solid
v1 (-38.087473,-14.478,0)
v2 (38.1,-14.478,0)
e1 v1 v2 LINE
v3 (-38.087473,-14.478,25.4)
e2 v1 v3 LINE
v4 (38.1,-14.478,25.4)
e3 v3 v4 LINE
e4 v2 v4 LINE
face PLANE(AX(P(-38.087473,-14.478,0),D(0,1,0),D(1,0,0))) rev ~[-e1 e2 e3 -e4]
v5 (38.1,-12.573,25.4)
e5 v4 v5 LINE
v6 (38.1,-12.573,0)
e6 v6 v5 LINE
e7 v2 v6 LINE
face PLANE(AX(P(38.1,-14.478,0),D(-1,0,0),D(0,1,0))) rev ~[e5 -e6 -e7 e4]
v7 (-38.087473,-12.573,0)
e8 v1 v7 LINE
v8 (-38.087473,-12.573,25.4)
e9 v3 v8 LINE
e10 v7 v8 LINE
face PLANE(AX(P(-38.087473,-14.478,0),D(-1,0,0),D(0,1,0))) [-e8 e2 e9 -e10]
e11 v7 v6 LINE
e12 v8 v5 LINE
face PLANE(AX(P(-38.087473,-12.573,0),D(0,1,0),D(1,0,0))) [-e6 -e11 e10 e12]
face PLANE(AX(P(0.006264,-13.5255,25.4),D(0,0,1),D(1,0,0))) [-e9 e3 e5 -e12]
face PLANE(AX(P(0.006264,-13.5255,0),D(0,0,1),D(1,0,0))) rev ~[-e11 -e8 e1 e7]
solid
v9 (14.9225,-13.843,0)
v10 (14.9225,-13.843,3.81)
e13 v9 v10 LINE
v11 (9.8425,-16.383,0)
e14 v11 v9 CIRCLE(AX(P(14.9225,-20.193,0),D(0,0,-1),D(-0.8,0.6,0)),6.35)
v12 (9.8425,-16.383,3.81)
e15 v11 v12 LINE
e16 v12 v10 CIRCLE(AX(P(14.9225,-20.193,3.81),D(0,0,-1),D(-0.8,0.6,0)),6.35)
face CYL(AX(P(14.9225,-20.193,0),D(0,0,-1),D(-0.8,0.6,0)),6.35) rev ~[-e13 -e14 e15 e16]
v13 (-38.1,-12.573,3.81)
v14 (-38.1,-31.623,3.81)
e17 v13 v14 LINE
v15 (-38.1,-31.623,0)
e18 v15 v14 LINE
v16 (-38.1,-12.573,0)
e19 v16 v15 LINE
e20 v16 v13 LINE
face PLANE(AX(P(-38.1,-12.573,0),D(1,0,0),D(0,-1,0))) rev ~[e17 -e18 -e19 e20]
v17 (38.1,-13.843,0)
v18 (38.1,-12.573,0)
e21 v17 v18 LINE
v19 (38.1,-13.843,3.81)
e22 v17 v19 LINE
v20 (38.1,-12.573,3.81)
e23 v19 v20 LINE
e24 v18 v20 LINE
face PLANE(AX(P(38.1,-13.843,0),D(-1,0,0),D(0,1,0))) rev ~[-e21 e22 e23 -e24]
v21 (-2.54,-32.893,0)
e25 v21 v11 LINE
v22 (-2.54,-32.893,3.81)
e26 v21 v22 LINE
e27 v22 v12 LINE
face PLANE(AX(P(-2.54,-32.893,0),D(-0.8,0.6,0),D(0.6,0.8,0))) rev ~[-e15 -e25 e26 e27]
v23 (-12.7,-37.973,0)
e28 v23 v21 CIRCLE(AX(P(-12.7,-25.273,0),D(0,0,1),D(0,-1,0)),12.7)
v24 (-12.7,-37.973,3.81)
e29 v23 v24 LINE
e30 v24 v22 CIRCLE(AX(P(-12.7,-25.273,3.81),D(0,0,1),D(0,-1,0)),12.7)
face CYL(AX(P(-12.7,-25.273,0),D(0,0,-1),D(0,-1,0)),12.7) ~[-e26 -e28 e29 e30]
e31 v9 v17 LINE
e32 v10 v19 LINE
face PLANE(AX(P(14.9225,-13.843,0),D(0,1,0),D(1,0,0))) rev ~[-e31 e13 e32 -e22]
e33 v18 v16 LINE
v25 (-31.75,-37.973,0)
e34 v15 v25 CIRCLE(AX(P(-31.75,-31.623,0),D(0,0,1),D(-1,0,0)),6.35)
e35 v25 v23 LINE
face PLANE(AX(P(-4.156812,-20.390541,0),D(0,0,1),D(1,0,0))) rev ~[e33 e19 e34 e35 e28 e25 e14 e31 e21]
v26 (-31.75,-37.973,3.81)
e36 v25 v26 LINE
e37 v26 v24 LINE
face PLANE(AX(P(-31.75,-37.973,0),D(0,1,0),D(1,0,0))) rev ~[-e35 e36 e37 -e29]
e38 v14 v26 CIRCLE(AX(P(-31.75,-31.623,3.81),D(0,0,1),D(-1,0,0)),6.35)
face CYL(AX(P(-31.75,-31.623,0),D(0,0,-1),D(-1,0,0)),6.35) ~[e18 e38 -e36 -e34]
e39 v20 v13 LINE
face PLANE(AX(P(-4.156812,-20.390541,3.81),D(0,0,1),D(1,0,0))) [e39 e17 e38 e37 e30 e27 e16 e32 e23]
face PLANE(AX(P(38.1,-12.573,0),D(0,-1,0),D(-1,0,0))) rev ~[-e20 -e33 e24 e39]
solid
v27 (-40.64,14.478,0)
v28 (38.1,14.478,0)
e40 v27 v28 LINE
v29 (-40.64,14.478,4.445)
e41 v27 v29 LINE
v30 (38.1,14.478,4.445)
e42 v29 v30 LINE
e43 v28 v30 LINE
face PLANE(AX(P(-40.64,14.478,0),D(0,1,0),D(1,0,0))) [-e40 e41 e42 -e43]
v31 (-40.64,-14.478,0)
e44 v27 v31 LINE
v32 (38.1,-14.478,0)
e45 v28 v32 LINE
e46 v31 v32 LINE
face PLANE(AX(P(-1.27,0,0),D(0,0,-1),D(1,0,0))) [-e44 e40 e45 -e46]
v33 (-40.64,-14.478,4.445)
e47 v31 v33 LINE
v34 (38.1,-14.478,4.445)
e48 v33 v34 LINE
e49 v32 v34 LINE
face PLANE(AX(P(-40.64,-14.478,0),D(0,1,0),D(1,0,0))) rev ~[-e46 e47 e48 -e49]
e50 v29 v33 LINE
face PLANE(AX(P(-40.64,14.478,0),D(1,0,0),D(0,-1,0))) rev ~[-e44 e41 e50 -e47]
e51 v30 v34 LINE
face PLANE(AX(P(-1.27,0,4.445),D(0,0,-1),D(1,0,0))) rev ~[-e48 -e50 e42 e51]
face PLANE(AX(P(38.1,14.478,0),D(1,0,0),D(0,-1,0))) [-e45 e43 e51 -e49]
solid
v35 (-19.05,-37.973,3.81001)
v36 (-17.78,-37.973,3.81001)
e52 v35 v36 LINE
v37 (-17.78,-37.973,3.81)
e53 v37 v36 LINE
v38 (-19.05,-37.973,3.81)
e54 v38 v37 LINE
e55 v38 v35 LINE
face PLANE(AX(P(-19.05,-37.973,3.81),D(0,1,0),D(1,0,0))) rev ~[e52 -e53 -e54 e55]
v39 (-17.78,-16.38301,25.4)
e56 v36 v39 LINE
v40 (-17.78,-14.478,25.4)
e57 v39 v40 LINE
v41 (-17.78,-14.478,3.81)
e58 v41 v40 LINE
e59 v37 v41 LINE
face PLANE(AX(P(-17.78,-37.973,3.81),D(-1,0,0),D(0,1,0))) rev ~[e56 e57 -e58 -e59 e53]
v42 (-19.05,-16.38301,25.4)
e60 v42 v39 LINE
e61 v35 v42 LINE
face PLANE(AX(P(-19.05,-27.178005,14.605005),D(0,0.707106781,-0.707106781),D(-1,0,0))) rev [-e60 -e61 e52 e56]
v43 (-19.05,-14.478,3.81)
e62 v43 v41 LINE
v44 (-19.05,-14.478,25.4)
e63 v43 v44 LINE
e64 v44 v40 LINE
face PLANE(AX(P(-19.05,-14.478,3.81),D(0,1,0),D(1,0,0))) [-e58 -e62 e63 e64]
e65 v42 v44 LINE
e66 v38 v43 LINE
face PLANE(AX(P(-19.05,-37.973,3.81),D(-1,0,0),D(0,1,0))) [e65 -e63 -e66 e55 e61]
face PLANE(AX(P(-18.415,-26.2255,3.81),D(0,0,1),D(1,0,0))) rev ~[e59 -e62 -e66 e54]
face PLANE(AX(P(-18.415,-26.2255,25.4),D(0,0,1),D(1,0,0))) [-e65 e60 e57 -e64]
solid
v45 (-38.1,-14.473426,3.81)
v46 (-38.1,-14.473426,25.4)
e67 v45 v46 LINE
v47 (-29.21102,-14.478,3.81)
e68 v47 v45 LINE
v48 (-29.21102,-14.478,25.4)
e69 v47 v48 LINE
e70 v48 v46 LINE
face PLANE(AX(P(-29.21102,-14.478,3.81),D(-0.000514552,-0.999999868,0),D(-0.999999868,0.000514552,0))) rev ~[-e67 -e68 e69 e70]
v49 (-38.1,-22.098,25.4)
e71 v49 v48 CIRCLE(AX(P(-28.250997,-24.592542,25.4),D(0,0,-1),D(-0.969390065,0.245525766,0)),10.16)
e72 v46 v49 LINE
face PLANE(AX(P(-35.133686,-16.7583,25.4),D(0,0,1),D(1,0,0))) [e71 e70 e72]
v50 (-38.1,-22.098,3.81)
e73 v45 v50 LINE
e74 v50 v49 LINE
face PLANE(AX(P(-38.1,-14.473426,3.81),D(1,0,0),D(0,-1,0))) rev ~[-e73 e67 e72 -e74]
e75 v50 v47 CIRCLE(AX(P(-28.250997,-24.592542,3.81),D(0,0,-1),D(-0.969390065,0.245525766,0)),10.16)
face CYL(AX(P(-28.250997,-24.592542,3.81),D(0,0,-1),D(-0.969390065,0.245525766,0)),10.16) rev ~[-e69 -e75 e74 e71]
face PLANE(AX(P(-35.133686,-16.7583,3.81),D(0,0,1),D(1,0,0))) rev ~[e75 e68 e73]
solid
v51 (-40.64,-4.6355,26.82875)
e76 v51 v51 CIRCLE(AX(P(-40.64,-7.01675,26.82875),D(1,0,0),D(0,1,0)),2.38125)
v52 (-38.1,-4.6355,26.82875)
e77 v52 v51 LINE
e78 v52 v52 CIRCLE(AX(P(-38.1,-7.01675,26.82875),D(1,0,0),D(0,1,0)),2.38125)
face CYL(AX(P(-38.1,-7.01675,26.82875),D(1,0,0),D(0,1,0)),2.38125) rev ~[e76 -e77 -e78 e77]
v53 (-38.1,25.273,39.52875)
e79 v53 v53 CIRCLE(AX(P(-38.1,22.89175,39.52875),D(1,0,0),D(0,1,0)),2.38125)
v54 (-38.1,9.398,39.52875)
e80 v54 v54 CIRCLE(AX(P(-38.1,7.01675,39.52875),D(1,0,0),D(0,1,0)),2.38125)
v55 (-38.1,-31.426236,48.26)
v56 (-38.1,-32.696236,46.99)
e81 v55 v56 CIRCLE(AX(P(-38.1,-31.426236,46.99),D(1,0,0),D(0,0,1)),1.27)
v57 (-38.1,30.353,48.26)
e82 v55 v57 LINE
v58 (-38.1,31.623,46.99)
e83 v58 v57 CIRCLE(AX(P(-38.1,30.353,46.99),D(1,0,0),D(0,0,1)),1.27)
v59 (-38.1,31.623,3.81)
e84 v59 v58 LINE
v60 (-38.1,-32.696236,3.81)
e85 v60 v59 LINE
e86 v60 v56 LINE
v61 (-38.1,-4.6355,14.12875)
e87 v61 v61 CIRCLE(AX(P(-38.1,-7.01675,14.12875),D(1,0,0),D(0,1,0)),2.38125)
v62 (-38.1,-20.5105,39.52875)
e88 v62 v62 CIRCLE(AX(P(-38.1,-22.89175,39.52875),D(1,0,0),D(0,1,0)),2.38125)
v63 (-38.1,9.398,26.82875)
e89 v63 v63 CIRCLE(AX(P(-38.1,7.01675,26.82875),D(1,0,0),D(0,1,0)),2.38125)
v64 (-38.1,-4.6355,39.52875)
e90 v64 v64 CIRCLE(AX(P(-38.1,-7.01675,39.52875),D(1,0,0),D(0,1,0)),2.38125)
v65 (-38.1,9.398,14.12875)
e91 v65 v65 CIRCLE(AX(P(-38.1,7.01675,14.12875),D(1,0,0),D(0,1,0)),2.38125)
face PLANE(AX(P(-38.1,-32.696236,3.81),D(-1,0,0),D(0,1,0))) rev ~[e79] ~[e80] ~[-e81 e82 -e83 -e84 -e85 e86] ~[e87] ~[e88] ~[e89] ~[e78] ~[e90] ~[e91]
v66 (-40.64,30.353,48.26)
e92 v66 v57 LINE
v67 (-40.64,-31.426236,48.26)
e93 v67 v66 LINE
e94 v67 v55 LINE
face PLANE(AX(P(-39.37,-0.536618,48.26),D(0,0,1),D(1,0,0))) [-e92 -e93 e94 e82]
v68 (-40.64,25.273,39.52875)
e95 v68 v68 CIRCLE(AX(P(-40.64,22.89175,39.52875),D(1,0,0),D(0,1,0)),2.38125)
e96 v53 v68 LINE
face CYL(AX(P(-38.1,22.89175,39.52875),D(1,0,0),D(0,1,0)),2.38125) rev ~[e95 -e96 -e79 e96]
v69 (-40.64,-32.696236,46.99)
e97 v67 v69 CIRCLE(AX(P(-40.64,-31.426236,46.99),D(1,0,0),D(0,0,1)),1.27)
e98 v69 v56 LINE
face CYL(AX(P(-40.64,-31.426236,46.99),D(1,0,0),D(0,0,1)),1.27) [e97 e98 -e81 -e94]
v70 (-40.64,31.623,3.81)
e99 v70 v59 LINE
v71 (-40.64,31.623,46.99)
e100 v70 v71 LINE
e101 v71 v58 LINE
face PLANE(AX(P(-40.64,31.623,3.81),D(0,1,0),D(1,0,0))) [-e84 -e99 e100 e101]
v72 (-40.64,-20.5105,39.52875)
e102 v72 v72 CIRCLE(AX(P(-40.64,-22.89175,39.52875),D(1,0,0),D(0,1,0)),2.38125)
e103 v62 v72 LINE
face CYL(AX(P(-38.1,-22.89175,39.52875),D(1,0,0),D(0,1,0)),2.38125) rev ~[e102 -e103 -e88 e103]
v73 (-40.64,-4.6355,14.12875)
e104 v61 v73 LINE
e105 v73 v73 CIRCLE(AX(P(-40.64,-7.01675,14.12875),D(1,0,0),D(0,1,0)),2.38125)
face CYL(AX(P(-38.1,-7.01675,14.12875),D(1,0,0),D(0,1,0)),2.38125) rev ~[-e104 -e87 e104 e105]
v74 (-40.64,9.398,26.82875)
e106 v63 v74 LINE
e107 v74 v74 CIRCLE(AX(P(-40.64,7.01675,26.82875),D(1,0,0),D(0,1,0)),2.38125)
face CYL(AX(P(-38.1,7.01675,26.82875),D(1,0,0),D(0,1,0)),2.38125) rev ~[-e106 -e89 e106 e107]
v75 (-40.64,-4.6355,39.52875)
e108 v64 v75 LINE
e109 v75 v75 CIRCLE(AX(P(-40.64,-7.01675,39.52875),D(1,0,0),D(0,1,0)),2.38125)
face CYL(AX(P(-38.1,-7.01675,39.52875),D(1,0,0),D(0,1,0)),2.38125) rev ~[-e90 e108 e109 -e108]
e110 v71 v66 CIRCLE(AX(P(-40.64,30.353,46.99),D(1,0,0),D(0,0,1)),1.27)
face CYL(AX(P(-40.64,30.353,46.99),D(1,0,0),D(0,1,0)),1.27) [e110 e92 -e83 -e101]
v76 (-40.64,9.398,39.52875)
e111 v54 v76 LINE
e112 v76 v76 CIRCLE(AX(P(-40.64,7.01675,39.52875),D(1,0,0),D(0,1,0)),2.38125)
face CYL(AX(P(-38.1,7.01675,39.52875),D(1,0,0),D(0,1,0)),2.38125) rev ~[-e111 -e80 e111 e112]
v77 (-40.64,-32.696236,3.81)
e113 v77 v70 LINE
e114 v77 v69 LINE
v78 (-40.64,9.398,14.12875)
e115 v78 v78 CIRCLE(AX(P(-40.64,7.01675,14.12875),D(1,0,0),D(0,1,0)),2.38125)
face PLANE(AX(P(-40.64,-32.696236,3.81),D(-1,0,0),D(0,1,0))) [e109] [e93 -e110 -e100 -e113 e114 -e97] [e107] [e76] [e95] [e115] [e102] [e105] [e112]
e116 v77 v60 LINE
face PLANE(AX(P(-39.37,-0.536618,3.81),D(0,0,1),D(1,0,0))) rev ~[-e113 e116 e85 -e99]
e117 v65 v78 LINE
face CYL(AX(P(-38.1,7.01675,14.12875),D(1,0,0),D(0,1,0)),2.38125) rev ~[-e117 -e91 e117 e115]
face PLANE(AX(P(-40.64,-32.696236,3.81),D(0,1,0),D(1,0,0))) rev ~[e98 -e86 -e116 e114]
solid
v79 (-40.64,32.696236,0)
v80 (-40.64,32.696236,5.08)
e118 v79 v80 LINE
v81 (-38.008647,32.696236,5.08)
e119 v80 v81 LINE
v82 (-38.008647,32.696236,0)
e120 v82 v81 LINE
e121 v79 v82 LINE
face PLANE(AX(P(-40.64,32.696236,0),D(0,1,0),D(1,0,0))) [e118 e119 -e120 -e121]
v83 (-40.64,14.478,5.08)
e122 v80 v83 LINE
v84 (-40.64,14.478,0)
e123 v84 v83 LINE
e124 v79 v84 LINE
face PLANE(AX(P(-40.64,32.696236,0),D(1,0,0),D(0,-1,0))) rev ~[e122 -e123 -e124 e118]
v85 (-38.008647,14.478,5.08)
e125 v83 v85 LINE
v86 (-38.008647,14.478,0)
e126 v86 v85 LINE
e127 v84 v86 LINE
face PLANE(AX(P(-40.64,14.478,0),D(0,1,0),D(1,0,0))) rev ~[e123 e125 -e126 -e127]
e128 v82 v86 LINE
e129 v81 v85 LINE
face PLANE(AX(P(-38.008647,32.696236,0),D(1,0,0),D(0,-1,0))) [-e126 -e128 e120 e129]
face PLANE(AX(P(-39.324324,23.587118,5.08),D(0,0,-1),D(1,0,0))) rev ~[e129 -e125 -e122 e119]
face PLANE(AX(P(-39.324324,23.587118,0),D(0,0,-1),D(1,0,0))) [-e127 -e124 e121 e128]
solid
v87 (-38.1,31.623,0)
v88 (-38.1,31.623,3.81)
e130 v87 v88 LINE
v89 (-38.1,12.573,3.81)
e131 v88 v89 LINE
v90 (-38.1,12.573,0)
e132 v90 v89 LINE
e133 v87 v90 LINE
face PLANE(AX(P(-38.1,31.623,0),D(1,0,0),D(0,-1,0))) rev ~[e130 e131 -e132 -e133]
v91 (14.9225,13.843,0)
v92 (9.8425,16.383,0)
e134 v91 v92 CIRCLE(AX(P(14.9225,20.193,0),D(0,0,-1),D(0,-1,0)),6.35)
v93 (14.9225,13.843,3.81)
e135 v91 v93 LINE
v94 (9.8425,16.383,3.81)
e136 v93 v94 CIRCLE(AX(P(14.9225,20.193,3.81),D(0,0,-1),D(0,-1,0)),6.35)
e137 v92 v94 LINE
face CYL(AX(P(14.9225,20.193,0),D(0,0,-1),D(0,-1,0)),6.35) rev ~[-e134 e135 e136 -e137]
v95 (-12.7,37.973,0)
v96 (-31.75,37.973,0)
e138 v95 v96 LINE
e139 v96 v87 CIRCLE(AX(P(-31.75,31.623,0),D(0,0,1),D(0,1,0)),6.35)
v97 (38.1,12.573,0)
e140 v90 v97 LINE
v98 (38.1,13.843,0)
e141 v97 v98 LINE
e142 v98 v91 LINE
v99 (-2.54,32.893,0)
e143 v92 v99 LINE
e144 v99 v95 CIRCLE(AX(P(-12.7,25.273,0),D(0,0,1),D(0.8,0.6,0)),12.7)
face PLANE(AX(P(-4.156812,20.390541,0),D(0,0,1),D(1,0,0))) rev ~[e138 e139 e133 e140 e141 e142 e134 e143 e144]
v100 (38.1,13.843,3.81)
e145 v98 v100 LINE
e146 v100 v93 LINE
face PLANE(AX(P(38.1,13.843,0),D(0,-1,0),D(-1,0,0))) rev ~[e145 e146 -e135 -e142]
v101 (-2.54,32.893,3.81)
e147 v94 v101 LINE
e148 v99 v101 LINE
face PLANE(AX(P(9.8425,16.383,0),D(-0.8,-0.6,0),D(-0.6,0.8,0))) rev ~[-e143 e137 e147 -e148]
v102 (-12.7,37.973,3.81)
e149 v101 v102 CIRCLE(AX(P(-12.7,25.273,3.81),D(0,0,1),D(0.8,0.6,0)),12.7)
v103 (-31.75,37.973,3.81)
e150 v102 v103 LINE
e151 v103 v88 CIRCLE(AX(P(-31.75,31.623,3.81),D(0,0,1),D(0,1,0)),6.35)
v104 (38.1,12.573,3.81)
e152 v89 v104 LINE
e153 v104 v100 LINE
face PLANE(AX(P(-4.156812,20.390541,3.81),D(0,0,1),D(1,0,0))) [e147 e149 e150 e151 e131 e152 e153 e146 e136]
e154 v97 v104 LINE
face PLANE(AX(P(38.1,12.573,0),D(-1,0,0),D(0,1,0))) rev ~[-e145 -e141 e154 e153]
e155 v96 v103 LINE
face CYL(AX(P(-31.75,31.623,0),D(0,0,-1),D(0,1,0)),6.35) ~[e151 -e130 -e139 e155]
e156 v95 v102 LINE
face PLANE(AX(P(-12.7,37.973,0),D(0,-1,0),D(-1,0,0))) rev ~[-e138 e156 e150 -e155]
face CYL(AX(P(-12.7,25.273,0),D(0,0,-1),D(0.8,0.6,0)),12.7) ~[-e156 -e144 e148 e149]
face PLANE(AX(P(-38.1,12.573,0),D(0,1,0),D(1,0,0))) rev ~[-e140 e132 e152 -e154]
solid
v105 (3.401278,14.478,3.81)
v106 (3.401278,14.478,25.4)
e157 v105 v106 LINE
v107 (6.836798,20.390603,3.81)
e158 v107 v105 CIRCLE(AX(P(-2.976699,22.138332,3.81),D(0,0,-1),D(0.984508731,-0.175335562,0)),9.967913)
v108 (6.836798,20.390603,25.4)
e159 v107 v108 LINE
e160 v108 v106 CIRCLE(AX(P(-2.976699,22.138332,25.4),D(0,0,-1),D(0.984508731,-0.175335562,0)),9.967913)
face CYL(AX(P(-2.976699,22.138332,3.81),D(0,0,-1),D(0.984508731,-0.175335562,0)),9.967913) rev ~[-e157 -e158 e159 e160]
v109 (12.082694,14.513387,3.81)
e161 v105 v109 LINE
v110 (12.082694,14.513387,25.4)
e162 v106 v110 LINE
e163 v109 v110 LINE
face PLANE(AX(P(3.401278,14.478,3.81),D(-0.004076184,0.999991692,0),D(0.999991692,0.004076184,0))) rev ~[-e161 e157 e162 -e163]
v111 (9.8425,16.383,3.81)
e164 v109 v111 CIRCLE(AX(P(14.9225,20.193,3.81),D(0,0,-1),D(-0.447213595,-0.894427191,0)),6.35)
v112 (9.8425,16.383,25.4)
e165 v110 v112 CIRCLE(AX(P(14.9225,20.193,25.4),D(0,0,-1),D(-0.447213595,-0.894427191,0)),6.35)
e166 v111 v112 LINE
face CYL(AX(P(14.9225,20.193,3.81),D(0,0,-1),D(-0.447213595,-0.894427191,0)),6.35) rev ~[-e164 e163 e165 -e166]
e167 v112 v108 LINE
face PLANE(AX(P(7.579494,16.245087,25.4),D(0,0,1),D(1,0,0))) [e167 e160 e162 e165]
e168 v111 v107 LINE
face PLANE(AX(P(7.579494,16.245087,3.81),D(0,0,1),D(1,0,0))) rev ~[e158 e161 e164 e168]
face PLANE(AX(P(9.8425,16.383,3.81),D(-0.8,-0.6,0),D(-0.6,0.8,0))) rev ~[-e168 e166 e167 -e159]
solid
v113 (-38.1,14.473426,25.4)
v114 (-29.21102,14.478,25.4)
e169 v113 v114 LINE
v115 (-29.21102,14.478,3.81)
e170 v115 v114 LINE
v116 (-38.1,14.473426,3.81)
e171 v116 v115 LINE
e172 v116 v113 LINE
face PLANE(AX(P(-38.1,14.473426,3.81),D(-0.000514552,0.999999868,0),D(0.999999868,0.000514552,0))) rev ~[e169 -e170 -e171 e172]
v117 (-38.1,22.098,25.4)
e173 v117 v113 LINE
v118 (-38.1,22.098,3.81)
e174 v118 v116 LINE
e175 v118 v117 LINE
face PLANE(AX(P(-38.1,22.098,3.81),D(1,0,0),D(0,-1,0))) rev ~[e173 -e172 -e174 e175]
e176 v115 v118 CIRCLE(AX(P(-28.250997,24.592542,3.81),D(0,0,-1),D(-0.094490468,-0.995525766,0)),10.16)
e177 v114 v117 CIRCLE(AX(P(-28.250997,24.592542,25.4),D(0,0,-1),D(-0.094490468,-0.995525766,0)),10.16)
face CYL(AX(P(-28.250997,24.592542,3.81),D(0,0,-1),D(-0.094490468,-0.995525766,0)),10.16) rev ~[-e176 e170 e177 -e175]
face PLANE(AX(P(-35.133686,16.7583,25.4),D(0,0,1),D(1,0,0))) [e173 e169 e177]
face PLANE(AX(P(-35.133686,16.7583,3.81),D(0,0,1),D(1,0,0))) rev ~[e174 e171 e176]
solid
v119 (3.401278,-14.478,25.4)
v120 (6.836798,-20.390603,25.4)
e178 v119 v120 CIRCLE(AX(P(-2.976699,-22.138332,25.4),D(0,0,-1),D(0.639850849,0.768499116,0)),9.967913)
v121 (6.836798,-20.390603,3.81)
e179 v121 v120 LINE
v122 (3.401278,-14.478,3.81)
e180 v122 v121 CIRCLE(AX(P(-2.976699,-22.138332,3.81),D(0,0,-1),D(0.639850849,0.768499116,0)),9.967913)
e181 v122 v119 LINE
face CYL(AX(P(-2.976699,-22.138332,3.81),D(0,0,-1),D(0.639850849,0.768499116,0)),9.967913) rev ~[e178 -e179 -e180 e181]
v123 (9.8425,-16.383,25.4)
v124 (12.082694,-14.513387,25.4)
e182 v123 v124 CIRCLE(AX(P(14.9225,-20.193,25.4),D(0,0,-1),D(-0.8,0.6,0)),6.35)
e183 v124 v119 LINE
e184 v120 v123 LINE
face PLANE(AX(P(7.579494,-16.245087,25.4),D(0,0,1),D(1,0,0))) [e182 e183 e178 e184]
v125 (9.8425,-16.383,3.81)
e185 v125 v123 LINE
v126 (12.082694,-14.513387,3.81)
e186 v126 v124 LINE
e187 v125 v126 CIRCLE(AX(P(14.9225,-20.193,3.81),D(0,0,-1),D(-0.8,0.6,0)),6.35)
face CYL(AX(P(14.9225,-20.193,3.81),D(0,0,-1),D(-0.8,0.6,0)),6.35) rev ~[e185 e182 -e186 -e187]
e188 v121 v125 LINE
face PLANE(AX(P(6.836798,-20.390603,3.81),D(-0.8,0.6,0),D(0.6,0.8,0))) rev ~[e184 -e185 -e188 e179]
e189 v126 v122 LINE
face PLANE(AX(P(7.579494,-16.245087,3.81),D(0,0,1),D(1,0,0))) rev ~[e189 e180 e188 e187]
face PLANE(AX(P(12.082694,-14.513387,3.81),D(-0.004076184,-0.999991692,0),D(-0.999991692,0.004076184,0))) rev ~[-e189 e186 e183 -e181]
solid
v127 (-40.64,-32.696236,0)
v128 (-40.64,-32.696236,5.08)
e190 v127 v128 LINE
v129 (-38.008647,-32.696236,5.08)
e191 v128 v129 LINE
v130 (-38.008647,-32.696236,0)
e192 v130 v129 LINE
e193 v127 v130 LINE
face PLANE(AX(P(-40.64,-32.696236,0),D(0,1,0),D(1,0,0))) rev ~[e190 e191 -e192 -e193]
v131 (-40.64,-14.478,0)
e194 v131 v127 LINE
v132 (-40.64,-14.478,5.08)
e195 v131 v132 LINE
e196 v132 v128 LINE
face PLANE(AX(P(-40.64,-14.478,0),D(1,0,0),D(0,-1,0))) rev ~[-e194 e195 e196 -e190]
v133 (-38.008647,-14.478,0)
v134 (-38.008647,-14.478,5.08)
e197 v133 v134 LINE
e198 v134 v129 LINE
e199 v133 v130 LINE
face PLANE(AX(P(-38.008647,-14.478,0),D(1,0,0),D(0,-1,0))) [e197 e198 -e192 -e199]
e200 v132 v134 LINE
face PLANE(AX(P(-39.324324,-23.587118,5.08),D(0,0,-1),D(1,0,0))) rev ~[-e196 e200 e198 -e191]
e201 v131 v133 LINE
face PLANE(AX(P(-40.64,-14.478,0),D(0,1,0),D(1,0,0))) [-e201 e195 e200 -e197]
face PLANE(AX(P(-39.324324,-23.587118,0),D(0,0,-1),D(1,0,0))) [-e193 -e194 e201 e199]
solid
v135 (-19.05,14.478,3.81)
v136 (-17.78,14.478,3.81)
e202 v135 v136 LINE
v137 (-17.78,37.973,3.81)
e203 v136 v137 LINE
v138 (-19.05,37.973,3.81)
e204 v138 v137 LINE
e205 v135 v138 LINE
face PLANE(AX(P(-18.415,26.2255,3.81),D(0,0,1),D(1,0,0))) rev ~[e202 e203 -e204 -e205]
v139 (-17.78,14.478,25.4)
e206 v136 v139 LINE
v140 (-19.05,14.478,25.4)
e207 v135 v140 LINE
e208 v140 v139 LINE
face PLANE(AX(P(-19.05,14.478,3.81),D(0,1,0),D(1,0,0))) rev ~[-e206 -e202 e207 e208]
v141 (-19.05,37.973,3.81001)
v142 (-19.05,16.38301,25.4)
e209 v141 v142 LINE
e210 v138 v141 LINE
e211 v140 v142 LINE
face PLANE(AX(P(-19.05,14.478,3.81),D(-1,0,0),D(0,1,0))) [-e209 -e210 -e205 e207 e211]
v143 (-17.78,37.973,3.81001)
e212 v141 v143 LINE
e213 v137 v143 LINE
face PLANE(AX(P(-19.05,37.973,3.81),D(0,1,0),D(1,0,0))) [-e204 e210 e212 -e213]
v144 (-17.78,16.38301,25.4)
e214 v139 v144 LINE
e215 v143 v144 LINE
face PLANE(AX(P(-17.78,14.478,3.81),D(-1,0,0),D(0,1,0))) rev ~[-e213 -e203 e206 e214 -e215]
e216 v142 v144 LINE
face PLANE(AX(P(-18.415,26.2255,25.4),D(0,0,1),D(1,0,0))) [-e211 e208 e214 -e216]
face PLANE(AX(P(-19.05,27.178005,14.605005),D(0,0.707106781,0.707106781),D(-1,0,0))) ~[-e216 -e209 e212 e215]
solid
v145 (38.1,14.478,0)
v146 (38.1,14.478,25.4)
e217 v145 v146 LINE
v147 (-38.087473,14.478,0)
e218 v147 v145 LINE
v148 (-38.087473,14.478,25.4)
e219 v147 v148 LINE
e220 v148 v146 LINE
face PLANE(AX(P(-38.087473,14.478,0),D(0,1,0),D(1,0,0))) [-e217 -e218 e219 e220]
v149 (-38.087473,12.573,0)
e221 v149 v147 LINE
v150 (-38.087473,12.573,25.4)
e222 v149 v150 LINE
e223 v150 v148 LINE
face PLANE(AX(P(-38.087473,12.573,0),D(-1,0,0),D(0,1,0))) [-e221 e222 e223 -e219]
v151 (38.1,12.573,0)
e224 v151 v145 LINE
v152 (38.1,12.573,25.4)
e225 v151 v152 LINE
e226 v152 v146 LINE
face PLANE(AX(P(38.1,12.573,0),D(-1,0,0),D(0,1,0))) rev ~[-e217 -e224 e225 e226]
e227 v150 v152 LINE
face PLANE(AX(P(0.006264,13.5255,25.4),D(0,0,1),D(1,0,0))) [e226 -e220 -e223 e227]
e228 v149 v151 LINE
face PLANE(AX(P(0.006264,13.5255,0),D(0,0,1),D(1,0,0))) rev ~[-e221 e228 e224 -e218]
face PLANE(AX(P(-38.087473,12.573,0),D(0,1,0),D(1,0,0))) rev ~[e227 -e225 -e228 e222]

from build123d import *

# Parameters (mm, degrees)
F1_DEPTH   = 3.81
F2_W       = 2.54
F2_H       = 64.319235925
F3_DEPTH   = 44.45
F4_R       = 1.27
F5_R       = 1.27
F6_W       = 76.1874727905
F6_H       = 1.905
F7_DEPTH   = 25.4
F9_DEPTH   = 21.59
F11_DEPTH  = 21.59
F12_W      = 1.27
F12_H      = 23.495
F13_DEPTH  = 21.59
F14_SIZE   = 21.58999
F14_2_SIZE = 21.58999
F15_R      = 2.38125
F16_DEPTH  = 2.541
F17_W      = 78.74
F17_H      = 28.956
F18_DEPTH  = 4.445
F19_W      = 2.63135281
F19_H      = 18.218235925
F20_DEPTH  = 5.08


# Not quite as in the source:
# - a fillet or chamfer is up to 0.001 mm smaller than in the source, because OpenCascade refuses the exact size


with BuildPart() as f1:
    # F0 (on Top) → F1 (new body)
    with BuildSketch(Plane.XY):
        with BuildLine():
            Line((-38.1, 31.623), (-38.1, 12.573))
            Line((-38.1, 12.573), (12.7, 12.573))
            Line((12.7, 12.573), (38.1, 12.573))
            Line((38.1, 12.573), (38.1, 13.843))
            Line((38.1, 13.843), (14.9225, 13.843))
            ThreePointArc((14.9225, 13.843), (12.0826936686, 14.5133873372), (9.8425, 16.383))
            Line((9.8425, 16.383), (-2.54, 32.893))
            ThreePointArc((-2.54, 32.893), (-7.0203873372, 36.6322253257), (-12.7, 37.973))
            Line((-12.7, 37.973), (-31.75, 37.973))
            ThreePointArc((-31.75, 37.973), (-36.2401280605, 36.1131280605), (-38.1, 31.623))
        make_face()
    extrude(amount=F1_DEPTH)


with BuildPart() as f1b:
    # F0 (on Top) → F1, piece 2 (new body)
    with BuildSketch(Plane.XY):
        with BuildLine():
            Line((14.9225, -13.843), (38.1, -13.843))
            Line((38.1, -13.843), (38.1, -12.573))
            Line((38.1, -12.573), (12.7, -12.573))
            Line((12.7, -12.573), (-38.1, -12.573))
            Line((-38.1, -12.573), (-38.1, -31.623))
            ThreePointArc((-38.1, -31.623), (-36.2401280605, -36.1131280605), (-31.75, -37.973))
            Line((-31.75, -37.973), (-12.7, -37.973))
            ThreePointArc((-12.7, -37.973), (-7.0203873372, -36.6322253257), (-2.54, -32.893))
            Line((-2.54, -32.893), (9.8425, -16.383))
            ThreePointArc((9.8425, -16.383), (12.0826936686, -14.5133873372), (14.9225, -13.843))
        make_face()
    extrude(amount=F1_DEPTH)


with BuildPart() as f3:
    # F2 (on face) → F3 (new body)
    with BuildSketch(Plane.XY.offset(3.81)):
        with Locations((-39.37, -0.5366179625)):
            Rectangle(F2_W, F2_H)
    extrude(amount=F3_DEPTH)

    # F4
    f4_edges = [f3.edges().sort_by_distance(p)[0] for p in [
        (-39.37, 31.623, 48.26),
    ]]
    fillet(f4_edges, radius=F4_R)

    # F5
    f5_edges = [f3.edges().sort_by_distance(p)[0] for p in [
        (-39.37, -32.696236, 48.26),
    ]]
    fillet(f5_edges, radius=F5_R)

    # F15 (on face) → F16 (cut, through all)
    with BuildSketch(Plane.YZ.offset(-38.1)):
        with Locations((22.89175, 39.52875)):
            Circle(F15_R)
        with Locations((7.01675, 39.52875)):
            Circle(F15_R)
        with Locations((7.01675, 26.82875)):
            Circle(F15_R)
        with Locations((7.01675, 14.12875)):
            Circle(F15_R)
        with Locations((-22.89175, 39.52875)):
            Circle(F15_R)
        with Locations((-7.01675, 26.82875)):
            Circle(F15_R)
        with Locations((-7.01675, 14.12875)):
            Circle(F15_R)
        with Locations((-7.01675, 39.52875)):
            Circle(F15_R)
    extrude(amount=-F16_DEPTH, mode=Mode.SUBTRACT)


with BuildPart() as f7:
    # F6 (on Top) → F7 (new body)
    with BuildSketch(Plane.XY):
        with Locations((0.0062636048, 13.5255)):
            Rectangle(F6_W, F6_H)
    extrude(amount=F7_DEPTH)


with BuildPart() as f7b:
    # F6 (on Top) → F7, piece 2 (new body)
    with BuildSketch(Plane.XY):
        with Locations((0.0062636048, -13.5255)):
            Rectangle(F6_W, F6_H)
    extrude(amount=F7_DEPTH)


with BuildPart() as f9:
    # F8 (on face) → F9 (new body)
    with BuildSketch(Plane.XY.offset(3.81)):
        with BuildLine():
            ThreePointArc((-29.2110200971, 14.478), (-34.8634746859, 16.8788696345), (-38.1, 22.098))
            Line((-38.1, 22.098), (-38.1, 14.4734261557))
            Line((-38.1, 14.4734261557), (-29.2110200971, 14.478))
        make_face()
    extrude(amount=F9_DEPTH)


with BuildPart() as f9b:
    # F8 (on face) → F9, piece 2 (new body)
    with BuildSketch(Plane.XY.offset(3.81)):
        with BuildLine():
            Line((-38.1, -14.4734261557), (-38.1, -22.098))
            ThreePointArc((-38.1, -22.098), (-34.8634746859, -16.8788696345), (-29.2110200971, -14.478))
            Line((-29.2110200971, -14.478), (-38.1, -14.4734261557))
        make_face()
    extrude(amount=F9_DEPTH)


with BuildPart() as f11:
    # F10 (on face) → F11 (new body)
    with BuildSketch(Plane.XY.offset(3.81)):
        with BuildLine():
            ThreePointArc((6.8367980262, 20.3906026317), (5.6419248641, 17.1304778187), (3.4012782853, 14.478))
            Line((3.4012782853, 14.478), (12.0826936686, 14.5133873372))
            ThreePointArc((12.0826936686, 14.5133873372), (10.8537537608, 15.3177765137), (9.8425, 16.383))
            Line((9.8425, 16.383), (6.8367980262, 20.3906026317))
        make_face()
    extrude(amount=F11_DEPTH)


with BuildPart() as f11b:
    # F10 (on face) → F11, piece 2 (new body)
    with BuildSketch(Plane.XY.offset(3.81)):
        with BuildLine():
            Line((12.0826936686, -14.5133873372), (3.4012782853, -14.478))
            ThreePointArc((3.4012782853, -14.478), (5.6419248641, -17.1304778187), (6.8367980262, -20.3906026317))
            Line((6.8367980262, -20.3906026317), (9.8425, -16.383))
            ThreePointArc((9.8425, -16.383), (10.8537537608, -15.3177765137), (12.0826936686, -14.5133873372))
        make_face()
    extrude(amount=F11_DEPTH)


with BuildPart() as f13:
    # F12 (on face) → F13 (new body)
    with BuildSketch(Plane.XY.offset(3.81)):
        with Locations((-18.415, 26.2255)):
            Rectangle(F12_W, F12_H)
    extrude(amount=F13_DEPTH)

    # F14 (size 21.59 in the source; OpenCascade refuses exactly that, so slightly less here)
    f14_edges = [f13.edges().sort_by_distance(p)[0] for p in [
        (-18.415, 37.973, 25.4),
    ]]
    chamfer(f14_edges, length=F14_SIZE)


with BuildPart() as f13b:
    # F12 (on face) → F13, piece 2 (new body)
    with BuildSketch(Plane.XY.offset(3.81)):
        with Locations((-18.415, -26.2255)):
            Rectangle(F12_W, F12_H)
    extrude(amount=F13_DEPTH)

    # F14#2 (size 21.59 in the source; OpenCascade refuses exactly that, so slightly less here)
    f14_2_edges = [f13b.edges().sort_by_distance(p)[0] for p in [
        (-18.415, -37.973, 25.4),
    ]]
    chamfer(f14_2_edges, length=F14_2_SIZE)


with BuildPart() as f18:
    # F17 (on face) → F18 (new body)
    with BuildSketch(Plane(origin=(0, 0, 0), x_dir=(1, 0, 0), z_dir=(0, 0, -1))):
        with Locations((-1.27, 0)):
            Rectangle(F17_W, F17_H)
    extrude(amount=-F18_DEPTH)


with BuildPart() as f20:
    # F19 (on face) → F20 (new body)
    with BuildSketch(Plane(origin=(0, 0, 0), x_dir=(1, 0, 0), z_dir=(0, 0, -1))):
        with Locations((-39.324323595, 23.5871179625)):
            Rectangle(F19_W, F19_H)
    extrude(amount=-F20_DEPTH)


with BuildPart() as f20b:
    # F19 (on face) → F20, piece 2 (new body)
    with BuildSketch(Plane(origin=(0, 0, 0), x_dir=(1, 0, 0), z_dir=(0, 0, -1))):
        with Locations((-39.324323595, -23.5871179625)):
            Rectangle(F19_W, F19_H)
    extrude(amount=-F20_DEPTH)


solid = Compound([f1.part, f1b.part, f3.part, f7.part, f7b.part, f9.part, f9b.part, f11.part, f11b.part, f13.part, f13b.part, f18.part, f20.part, f20b.part])
